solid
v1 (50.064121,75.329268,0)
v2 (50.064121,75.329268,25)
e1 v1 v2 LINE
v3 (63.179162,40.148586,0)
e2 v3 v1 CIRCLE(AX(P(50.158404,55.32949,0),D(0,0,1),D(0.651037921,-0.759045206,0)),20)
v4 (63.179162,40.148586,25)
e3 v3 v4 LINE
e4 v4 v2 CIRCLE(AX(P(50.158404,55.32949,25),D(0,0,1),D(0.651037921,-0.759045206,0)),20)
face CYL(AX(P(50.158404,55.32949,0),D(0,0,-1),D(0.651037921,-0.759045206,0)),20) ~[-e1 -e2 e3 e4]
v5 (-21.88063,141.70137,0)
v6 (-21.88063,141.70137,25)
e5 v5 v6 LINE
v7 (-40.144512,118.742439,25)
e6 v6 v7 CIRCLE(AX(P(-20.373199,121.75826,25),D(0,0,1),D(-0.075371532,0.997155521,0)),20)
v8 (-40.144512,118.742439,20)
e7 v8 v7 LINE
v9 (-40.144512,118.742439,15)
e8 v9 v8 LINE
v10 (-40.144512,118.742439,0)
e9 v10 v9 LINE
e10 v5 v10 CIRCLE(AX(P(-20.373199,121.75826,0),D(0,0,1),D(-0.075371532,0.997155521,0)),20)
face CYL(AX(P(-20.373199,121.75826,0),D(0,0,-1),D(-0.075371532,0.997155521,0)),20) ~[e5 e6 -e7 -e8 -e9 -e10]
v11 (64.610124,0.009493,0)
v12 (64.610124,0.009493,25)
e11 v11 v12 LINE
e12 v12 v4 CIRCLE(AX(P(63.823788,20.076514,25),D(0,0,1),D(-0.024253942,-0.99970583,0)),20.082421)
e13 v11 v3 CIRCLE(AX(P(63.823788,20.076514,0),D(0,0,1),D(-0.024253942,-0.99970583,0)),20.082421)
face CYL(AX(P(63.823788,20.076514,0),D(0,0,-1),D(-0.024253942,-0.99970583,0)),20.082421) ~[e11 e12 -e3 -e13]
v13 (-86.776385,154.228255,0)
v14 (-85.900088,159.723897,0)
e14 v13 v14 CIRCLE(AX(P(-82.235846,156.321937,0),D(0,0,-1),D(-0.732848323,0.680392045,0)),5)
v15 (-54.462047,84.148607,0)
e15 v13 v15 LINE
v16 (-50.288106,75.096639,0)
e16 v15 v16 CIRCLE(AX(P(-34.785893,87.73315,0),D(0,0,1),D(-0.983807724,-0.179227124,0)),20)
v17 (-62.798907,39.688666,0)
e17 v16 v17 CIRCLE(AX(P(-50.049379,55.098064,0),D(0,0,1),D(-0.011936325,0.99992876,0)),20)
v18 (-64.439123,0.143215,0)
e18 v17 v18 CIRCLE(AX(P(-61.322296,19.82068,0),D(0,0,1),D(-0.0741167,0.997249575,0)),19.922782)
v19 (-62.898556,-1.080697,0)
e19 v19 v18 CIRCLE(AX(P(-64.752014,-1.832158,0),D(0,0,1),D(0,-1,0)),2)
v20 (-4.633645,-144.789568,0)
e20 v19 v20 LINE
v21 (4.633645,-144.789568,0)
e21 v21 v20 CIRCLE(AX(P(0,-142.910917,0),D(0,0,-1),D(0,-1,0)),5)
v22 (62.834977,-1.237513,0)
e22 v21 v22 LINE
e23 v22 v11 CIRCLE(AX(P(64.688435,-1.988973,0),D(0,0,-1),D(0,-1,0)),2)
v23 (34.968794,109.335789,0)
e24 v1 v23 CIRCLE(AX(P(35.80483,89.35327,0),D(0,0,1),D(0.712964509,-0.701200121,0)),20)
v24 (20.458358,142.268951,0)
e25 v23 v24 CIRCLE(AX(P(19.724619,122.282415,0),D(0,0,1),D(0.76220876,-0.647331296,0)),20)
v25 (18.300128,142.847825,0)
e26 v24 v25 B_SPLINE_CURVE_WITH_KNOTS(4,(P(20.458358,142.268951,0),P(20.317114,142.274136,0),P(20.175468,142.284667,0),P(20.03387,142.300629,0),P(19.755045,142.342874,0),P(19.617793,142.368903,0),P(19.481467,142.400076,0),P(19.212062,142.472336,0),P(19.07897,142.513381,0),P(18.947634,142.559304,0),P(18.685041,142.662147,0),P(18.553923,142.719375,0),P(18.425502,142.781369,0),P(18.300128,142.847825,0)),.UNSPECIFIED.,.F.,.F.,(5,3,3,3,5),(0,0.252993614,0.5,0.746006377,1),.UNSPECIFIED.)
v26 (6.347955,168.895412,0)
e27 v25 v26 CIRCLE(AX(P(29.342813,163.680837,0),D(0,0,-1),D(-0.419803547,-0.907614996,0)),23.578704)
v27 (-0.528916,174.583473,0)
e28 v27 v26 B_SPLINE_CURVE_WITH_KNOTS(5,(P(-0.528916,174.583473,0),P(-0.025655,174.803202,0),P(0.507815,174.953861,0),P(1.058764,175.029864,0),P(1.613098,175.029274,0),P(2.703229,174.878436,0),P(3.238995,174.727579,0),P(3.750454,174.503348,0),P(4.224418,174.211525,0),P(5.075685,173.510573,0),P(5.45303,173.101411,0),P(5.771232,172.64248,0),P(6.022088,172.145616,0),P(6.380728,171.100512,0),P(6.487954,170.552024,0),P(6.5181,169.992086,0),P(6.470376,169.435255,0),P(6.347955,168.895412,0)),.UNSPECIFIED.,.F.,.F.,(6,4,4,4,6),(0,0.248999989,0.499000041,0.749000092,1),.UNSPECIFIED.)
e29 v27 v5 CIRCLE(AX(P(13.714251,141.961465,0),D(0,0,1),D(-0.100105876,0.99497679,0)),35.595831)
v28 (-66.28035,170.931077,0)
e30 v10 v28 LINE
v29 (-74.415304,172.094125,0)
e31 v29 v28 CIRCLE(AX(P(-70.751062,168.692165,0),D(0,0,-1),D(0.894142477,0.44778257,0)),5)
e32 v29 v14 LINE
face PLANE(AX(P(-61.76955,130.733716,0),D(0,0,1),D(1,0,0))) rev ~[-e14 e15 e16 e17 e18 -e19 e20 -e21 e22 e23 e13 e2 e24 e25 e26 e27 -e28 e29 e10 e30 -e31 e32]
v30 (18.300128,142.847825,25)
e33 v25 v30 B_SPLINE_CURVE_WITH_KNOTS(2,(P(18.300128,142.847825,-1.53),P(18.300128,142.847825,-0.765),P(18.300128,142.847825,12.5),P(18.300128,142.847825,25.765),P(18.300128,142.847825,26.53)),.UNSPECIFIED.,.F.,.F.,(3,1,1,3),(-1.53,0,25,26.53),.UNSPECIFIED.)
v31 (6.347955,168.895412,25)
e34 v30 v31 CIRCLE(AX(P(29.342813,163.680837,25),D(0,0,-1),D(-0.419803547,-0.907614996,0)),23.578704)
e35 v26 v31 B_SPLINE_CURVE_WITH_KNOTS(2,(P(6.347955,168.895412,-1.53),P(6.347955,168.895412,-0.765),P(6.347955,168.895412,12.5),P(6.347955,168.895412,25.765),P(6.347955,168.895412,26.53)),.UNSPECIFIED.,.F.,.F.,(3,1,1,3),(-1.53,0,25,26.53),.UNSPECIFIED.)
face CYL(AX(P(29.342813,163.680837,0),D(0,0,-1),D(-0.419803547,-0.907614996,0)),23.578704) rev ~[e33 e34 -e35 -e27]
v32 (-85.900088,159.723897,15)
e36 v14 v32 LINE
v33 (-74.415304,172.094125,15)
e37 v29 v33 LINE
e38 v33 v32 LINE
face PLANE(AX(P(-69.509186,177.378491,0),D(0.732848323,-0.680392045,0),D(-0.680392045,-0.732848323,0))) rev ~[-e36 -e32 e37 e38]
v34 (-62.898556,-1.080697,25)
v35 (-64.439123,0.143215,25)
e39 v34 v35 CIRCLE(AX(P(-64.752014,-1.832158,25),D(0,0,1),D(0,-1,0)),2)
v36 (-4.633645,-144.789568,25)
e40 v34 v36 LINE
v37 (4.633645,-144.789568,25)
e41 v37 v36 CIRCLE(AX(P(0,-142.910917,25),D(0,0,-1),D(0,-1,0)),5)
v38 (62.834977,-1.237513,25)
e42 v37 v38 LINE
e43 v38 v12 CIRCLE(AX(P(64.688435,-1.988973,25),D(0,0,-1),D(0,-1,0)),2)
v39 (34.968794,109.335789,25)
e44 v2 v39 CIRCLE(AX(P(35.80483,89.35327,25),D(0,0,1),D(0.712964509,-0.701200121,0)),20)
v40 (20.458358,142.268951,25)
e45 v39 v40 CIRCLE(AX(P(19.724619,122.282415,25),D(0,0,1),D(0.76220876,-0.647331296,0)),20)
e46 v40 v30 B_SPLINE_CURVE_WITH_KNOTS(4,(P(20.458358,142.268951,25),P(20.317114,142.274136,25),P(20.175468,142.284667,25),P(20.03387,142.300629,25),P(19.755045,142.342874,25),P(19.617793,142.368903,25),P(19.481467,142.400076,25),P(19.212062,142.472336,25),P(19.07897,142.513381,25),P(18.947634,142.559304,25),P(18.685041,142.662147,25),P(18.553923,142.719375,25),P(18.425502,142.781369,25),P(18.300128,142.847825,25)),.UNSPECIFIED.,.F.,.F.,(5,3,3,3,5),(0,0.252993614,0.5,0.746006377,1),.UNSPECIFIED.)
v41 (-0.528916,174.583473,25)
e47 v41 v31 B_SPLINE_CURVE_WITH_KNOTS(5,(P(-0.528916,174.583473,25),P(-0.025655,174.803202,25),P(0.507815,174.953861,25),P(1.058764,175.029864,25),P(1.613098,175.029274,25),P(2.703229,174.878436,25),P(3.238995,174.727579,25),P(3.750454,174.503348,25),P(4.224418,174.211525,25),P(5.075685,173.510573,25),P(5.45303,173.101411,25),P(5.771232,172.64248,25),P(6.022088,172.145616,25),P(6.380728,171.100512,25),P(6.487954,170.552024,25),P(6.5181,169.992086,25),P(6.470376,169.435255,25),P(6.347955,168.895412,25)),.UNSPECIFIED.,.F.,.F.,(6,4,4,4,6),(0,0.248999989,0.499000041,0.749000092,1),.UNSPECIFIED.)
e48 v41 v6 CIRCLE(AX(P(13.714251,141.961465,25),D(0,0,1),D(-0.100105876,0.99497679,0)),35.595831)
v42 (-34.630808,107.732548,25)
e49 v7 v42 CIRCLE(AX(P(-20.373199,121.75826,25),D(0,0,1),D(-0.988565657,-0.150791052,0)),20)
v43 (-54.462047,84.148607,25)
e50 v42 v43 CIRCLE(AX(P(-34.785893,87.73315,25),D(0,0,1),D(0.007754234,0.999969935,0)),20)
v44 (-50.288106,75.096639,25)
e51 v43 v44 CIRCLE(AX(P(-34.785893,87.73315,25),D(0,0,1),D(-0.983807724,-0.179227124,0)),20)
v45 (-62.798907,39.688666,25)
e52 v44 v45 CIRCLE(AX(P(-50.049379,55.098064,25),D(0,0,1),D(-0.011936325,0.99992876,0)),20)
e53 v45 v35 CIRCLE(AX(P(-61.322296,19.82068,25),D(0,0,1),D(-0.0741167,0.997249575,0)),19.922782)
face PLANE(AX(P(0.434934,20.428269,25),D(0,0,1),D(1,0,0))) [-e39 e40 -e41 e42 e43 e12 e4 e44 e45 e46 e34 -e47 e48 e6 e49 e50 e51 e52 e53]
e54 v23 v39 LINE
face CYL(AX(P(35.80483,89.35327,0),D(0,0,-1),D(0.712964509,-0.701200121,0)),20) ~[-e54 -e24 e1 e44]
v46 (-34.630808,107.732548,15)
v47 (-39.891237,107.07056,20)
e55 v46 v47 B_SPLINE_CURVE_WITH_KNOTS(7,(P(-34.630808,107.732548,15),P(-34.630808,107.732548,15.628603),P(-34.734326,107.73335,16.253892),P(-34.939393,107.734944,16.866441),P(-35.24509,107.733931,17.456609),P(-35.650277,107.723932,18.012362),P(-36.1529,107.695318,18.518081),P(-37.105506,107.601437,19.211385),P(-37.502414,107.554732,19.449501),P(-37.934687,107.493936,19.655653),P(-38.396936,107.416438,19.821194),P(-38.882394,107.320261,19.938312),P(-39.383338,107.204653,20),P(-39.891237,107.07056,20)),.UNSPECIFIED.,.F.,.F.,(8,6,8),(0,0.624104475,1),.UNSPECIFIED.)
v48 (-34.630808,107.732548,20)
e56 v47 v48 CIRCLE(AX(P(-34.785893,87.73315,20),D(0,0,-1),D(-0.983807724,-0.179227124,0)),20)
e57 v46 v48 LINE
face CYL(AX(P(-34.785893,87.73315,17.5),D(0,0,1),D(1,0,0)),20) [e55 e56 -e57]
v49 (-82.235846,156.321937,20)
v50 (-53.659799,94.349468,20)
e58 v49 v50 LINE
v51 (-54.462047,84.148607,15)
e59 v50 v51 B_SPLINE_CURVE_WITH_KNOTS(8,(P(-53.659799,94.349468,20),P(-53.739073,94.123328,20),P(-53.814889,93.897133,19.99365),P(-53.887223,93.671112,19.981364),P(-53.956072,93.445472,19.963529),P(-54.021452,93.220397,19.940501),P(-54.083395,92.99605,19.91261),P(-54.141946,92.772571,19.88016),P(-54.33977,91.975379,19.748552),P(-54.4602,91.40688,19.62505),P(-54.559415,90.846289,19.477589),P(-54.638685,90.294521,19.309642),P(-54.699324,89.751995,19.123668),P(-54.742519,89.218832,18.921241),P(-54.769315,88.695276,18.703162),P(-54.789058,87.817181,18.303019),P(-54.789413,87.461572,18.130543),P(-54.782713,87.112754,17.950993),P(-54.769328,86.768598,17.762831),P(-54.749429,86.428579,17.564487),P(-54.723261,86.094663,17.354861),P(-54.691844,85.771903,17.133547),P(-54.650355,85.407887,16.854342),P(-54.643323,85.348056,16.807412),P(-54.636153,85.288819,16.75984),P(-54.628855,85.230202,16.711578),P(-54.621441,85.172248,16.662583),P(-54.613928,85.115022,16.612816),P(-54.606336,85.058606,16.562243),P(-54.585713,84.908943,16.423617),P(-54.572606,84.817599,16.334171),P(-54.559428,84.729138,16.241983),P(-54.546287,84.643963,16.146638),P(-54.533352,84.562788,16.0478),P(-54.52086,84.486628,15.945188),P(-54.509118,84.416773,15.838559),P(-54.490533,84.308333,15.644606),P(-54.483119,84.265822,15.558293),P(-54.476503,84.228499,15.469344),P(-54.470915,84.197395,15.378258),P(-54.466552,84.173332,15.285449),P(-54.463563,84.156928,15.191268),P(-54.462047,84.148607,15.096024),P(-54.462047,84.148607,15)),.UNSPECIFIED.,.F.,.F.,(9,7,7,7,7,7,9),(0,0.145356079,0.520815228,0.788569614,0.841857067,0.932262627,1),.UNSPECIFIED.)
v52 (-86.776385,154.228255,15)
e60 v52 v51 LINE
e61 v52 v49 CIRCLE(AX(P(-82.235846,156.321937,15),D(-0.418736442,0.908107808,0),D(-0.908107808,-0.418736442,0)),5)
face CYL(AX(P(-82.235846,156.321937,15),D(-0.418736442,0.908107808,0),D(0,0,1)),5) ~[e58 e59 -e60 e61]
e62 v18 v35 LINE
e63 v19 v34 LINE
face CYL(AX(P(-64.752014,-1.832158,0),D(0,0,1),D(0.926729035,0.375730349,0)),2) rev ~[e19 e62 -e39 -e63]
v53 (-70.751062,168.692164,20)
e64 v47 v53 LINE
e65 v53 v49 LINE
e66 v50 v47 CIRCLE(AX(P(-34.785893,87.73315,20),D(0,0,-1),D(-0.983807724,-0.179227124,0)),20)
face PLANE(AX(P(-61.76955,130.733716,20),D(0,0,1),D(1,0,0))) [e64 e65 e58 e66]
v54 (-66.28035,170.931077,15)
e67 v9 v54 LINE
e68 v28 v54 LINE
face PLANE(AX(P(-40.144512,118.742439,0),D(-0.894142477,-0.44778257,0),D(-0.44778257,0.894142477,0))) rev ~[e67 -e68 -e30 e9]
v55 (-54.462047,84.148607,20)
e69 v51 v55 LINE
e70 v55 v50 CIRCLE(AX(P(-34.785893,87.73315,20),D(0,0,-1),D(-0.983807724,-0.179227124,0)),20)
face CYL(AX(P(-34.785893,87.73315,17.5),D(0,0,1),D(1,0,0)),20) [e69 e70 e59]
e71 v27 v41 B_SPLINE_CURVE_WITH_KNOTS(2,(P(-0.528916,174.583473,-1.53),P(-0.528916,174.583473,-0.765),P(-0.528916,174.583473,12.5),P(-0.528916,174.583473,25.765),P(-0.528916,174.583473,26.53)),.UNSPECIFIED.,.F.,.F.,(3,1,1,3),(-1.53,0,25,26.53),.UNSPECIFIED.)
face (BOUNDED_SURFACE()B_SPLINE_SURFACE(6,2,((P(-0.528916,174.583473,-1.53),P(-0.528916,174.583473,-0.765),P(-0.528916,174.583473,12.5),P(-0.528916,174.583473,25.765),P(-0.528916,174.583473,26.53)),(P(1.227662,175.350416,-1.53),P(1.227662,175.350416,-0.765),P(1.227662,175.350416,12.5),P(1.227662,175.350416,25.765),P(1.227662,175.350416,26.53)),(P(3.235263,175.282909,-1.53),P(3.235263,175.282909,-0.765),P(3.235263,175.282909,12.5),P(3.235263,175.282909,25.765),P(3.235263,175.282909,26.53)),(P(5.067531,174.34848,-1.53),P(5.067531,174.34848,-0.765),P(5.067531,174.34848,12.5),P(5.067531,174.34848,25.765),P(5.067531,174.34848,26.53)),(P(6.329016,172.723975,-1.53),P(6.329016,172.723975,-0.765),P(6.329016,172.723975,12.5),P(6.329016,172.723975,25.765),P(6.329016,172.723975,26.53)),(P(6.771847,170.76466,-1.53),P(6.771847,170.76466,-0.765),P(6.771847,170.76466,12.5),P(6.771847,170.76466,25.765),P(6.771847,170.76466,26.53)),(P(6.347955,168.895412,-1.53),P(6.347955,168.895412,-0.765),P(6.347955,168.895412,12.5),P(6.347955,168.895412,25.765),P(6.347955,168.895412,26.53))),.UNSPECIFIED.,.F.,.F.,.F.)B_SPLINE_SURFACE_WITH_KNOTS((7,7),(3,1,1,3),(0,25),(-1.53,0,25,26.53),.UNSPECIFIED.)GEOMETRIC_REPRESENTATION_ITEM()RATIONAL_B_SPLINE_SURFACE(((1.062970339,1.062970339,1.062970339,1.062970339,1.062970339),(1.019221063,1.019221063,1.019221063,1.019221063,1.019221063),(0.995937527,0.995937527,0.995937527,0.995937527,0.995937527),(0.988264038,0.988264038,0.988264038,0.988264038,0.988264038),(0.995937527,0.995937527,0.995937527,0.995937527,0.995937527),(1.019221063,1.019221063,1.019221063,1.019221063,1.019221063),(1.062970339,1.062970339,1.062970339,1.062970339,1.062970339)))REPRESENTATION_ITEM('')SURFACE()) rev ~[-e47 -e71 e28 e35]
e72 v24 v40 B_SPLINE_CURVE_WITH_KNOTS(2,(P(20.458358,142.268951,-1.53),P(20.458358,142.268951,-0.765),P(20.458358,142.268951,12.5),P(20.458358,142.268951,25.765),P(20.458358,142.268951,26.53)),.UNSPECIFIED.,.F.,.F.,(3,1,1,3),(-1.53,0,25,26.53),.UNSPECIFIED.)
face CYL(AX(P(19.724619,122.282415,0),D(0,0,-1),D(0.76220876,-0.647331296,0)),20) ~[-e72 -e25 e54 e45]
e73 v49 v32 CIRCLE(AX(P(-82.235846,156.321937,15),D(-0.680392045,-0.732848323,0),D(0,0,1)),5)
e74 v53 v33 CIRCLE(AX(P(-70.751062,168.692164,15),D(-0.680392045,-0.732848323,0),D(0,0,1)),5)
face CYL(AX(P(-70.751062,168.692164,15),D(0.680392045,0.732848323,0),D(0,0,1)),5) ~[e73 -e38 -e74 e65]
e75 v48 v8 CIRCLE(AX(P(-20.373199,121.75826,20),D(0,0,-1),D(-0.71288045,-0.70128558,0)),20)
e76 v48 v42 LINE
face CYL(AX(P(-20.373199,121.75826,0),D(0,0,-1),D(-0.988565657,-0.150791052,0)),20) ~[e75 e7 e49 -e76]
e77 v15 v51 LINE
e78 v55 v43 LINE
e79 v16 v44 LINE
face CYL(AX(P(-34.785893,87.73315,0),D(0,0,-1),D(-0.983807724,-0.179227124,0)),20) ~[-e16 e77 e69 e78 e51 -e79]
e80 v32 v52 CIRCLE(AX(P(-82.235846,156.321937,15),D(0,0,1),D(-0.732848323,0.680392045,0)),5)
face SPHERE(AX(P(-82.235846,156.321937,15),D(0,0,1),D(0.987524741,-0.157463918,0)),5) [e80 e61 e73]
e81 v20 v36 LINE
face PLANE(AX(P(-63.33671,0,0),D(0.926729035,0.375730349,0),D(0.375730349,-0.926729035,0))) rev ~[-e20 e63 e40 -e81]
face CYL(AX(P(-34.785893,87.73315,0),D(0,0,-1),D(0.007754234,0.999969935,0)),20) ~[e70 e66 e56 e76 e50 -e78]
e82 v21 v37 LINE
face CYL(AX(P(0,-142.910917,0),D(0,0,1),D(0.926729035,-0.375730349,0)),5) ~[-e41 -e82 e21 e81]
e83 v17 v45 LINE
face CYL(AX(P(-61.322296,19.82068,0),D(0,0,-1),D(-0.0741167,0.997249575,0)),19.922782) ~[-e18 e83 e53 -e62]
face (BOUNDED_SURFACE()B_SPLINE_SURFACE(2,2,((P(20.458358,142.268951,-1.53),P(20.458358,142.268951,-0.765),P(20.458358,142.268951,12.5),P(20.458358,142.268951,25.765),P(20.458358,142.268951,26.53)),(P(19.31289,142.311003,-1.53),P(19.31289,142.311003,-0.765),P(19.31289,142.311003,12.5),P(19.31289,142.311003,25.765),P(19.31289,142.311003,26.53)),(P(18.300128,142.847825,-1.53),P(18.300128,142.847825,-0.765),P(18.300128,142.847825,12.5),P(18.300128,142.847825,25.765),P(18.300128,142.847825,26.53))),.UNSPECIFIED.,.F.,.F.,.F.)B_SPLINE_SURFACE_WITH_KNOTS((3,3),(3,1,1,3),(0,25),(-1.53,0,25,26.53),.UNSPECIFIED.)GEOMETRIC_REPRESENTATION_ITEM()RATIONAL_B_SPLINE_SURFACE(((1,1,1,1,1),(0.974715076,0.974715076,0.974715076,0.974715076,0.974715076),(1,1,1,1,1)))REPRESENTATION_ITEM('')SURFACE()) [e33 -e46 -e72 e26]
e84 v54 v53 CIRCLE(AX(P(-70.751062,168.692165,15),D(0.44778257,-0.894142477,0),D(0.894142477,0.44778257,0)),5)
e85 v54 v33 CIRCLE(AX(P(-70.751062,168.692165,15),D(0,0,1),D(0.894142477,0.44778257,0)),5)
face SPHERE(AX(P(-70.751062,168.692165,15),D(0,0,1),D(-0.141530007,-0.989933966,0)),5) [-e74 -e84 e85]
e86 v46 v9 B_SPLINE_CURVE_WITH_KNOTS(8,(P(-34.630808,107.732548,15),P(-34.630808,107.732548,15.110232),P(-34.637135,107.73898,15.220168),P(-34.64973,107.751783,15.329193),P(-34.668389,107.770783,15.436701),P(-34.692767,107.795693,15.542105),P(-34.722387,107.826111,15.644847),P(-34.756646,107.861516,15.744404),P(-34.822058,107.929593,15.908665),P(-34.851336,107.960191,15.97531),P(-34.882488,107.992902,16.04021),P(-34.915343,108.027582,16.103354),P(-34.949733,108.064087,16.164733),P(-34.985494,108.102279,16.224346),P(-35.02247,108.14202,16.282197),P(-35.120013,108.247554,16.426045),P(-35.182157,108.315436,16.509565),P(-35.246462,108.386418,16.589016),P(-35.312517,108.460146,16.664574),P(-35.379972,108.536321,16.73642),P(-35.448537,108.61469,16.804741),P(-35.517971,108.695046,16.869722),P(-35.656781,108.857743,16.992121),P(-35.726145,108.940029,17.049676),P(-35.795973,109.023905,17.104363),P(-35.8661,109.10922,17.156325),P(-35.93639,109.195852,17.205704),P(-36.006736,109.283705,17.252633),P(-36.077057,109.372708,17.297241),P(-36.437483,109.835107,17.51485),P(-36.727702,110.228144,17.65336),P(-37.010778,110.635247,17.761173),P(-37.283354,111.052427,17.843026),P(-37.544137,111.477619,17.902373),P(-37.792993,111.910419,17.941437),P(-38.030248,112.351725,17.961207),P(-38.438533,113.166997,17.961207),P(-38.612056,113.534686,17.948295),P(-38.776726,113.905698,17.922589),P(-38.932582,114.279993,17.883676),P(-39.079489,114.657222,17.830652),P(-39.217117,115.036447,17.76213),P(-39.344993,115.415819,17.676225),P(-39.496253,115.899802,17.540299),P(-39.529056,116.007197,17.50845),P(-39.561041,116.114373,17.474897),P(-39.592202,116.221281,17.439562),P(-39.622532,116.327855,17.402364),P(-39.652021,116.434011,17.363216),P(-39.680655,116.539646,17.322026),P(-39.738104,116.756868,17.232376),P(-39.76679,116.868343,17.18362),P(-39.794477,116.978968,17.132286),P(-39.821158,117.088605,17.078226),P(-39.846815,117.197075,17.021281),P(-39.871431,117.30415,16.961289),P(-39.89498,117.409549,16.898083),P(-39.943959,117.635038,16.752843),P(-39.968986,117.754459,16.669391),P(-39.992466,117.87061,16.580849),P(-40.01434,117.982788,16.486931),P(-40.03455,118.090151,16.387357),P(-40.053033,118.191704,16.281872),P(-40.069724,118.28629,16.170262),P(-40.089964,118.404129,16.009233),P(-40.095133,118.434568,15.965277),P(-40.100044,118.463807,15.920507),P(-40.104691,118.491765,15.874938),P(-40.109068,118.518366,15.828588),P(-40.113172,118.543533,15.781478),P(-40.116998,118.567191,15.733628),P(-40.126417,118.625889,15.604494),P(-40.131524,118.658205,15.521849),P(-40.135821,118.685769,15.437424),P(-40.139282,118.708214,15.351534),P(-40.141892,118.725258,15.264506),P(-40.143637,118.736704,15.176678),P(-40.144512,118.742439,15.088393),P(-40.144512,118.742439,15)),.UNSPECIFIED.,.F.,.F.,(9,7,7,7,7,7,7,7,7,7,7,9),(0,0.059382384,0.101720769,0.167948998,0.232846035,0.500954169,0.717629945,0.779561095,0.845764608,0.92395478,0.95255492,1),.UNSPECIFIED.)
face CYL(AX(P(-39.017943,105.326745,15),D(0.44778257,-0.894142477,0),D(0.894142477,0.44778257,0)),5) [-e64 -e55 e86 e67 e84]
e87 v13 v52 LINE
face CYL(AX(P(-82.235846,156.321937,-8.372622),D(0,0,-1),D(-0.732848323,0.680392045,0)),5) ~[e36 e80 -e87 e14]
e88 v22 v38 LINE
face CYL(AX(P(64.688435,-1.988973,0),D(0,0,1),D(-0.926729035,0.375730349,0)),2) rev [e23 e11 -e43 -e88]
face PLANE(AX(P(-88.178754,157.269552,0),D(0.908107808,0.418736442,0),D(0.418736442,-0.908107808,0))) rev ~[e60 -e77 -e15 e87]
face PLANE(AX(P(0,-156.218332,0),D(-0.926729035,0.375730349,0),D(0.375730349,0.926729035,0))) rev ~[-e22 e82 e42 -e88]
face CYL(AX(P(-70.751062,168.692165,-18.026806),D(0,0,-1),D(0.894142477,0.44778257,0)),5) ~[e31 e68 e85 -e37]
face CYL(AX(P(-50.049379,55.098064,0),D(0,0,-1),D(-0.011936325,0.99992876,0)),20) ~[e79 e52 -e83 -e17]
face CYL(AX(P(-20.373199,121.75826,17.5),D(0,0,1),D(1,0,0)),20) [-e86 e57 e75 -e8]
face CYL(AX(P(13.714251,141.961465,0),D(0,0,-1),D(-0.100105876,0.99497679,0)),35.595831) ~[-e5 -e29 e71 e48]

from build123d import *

# Parameters (mm, degrees)
F1_DEPTH     = 25
F2_R         = 5
F3_R         = 5
F4_R         = 2
F6_R         = 5
F7_DEPTH     = 20
F8_T1_DEPTH  = 16.879655815
F8_T3_DEPTH  = 23.3726224193
F8_T5_DEPTH  = 33.0268060681
F8_T10_DEPTH = 5.1
F8_T16_DEPTH = 5.1
F8_T22_DEPTH = 98.4210661838
F8_S23_R     = 20
F8_T24_DEPTH = 53
F8_S25_R     = 20
F8_T26_DEPTH = 53
F8_T30_DEPTH = 70.867251183
F8_S31_R     = 20
F8_T32_DEPTH = 39
F8_S33_R     = 20
F8_T34_DEPTH = 39


# Not quite as in the source:
# - a fillet or chamfer that OpenCascade refuses, or shapes differently, is made with other operations: its cross-section is extruded or revolved along the edge and cut away or added
# - two fillets or chamfers of one size are made in one step


with BuildPart() as f1:
    # F0 (on Top) → F1 (new body)
    with BuildSketch(Plane.XY):
        with BuildLine():
            ThreePointArc((-62.7989065684, 39.6886658546), (-81.243248627, 20.090620438), (-63.3367104763, 0))
            Line((-63.3367104763, 0), (0, -156.2183324342))
            Line((0, -156.2183324342), (63.3367104763, 0))
            ThreePointArc((63.3367104763, 0), (83.9060549488, 20.1553189736), (63.1791622356, 40.1485861756))
            ThreePointArc((63.1791622356, 40.1485861756), (68.8985621757, 62.3156526678), (50.0641206725, 75.3292680691))
            ThreePointArc((50.0641206725, 75.3292680691), (54.0847867027, 97.4676528526), (34.9687938538, 109.335788913))
            ThreePointArc((34.9687938538, 109.335788913), (37.8165399559, 130.8078112166), (19.4443891765, 142.2804515145))
            ThreePointArc((19.4443891765, 142.2804515145), (6.5496116272, 157.6455026462), (10.1508991793, 177.3784905672))
            ThreePointArc((10.1508991793, 177.3784905672), (-12.7726518652, 165.7418593556), (-21.8806297798, 141.7013702435))
            ThreePointArc((-21.8806297798, 141.7013702435), (-36.0248561638, 134.2091888045), (-40.144512278, 118.7424387834))
            Line((-40.144512278, 118.7424387834), (-34.6308081302, 107.732548238))
            ThreePointArc((-34.6308081302, 107.732548238), (-50.0933619749, 100.6048777691), (-54.4620472952, 84.1486070408))
            Line((-54.4620472952, 84.1486070408), (-50.2881059675, 75.0966394345))
            ThreePointArc((-50.2881059675, 75.0966394345), (-68.9068668709, 61.7610342158), (-62.7989065684, 39.6886658546))
        make_face()
        with BuildLine():
            Line((-19.4251702535, 141.7357782283), (-21.8806297798, 141.7013702435))
            ThreePointArc((-21.8806297798, 141.7013702435), (-20.6534286134, 141.7562965225), (-19.4251702535, 141.7357782283))
        make_face(mode=Mode.SUBTRACT)
        with BuildLine():
            ThreePointArc((-40.144512278, 118.7424387834), (-38.2560486822, 112.8026084286), (-34.6308081302, 107.732548238))
            Line((-34.6308081302, 107.732548238), (-40.144512278, 118.7424387834))
        make_face()
        with BuildLine():
            ThreePointArc((-54.4620472952, 84.1486070408), (-52.9480489841, 79.3584206811), (-50.2881059675, 75.0966394345))
            Line((-50.2881059675, 75.0966394345), (-54.4620472952, 84.1486070408))
        make_face()
        with BuildLine():
            ThreePointArc((-19.4251702535, 141.7357782283), (-20.6534286134, 141.7562965225), (-21.8806297798, 141.7013702435))
            Line((-21.8806297798, 141.7013702435), (-19.4251702535, 141.7357782283))
        make_face()
    extrude(amount=F1_DEPTH)

    # F2
    f2_edges = [f1.edges().sort_by_distance(p)[0] for p in [
        (10.150899, 177.378491, 12.5),
    ]]
    fillet(f2_edges, radius=F2_R)

    # F3
    f3_edges = [f1.edges().sort_by_distance(p)[0] for p in [
        (0, -156.218332, 12.5),
    ]]
    fillet(f3_edges, radius=F3_R)

    # F4
    f4_edges = [f1.edges().sort_by_distance(p)[0] for p in [
        (63.33671, 0, 12.5),
        (-63.33671, 0, 12.5),
    ]]
    fillet(f4_edges, radius=F4_R)

    # F6
    f6_edges = [f1.edges().sort_by_distance(p)[0] for p in [
        (19.444389, 142.280452, 12.5),
    ]]
    fillet(f6_edges, radius=F6_R)

    # F0 (on Top) → F7 (join)
    with BuildSketch(Plane.XY):
        with BuildLine():
            Line((-88.1787538528, 157.26955235), (-54.4620472952, 84.1486070408))
            ThreePointArc((-54.4620472952, 84.1486070408), (-50.0933619749, 100.6048777691), (-34.6308081302, 107.732548238))
            ThreePointArc((-34.6308081302, 107.732548238), (-38.2560486822, 112.8026084286), (-40.144512278, 118.7424387834))
            Line((-40.144512278, 118.7424387834), (-69.5091858506, 177.3784905672))
            Line((-69.5091858506, 177.3784905672), (-88.1787538528, 157.26955235))
        make_face()
    extrude(amount=F7_DEPTH)

    # F8: fillet of radius 5 on 5 edges, made by hand

    # F8_s2 → F8_t1 (cut)
    with BuildSketch(Plane(origin=(51.3609651153, 55.3207484048, 0), x_dir=(0, 0, 1), z_dir=(-0.6803920453, -0.7328483231, 0))):
        with BuildLine():
            ThreePointArc((20, 166.626604285), (18.5355339059, 170.1621381909), (15, 171.626604285))
            Line((15, 171.626604285), (20, 171.626604285))
            Line((20, 171.626604285), (20, 166.626604285))
        make_face()
    extrude(amount=F8_T1_DEPTH, mode=Mode.SUBTRACT)

    # F8_s4 → F8_t3 (cut)
    with BuildSketch(Plane.XY.offset(-8.3726224193)):
        with BuildLine():
            ThreePointArc((-85.9000875758, 159.72389727), (-87.1734696665, 157.1092566329), (-86.7763850028, 154.2282548314))
            Line((-86.7763850028, 154.2282548314), (-88.1787538528, 157.26955235))
            Line((-88.1787538528, 157.26955235), (-85.9000875758, 159.72389727))
        make_face()
    extrude(amount=F8_T3_DEPTH, mode=Mode.SUBTRACT)

    # F8_s6 → F8_t5 (cut)
    with BuildSketch(Plane.XY.offset(-18.0268060681)):
        with BuildLine():
            ThreePointArc((-66.280350029, 170.9310773526), (-70.0434123782, 173.6418343313), (-74.4153040312, 172.0941247282))
            Line((-74.4153040312, 172.0941247282), (-69.5091858506, 177.3784905672))
            Line((-69.5091858506, 177.3784905672), (-66.280350029, 170.9310773526))
        make_face()
    extrude(amount=F8_T5_DEPTH, mode=Mode.SUBTRACT)


with BuildPart() as f8_tool8:
    # F8_s9 → F8_t10 (new body)
    with BuildSketch(Plane.XY.offset(15)):
        Polygon((-82.2358459604, 156.3219370433), (-85.9733724081, 159.7919364745), (-88.2976120107, 157.2885046562), (-86.8671957836, 154.1863811872), align=None)
    extrude(amount=F8_T10_DEPTH)

    # F8_s11 → F8_t12 (revolve, cut)
    with BuildSketch(Plane(origin=(-82.2358459604, 156.3219370433, 15), x_dir=(0.9875247412, -0.1574639179, 0), z_dir=(-0.1574639179, -0.9875247412, 0))):
        with BuildLine():
            ThreePointArc((0, -5), (5, 0), (0, 5))
            Line((0, 5), (0, -5))
        make_face()
    revolve(axis=Axis((-82.2358459604, 156.3219370433, 15), (0, 0, 1)), mode=Mode.SUBTRACT)


with BuildPart() as f1_1:
    add(f1.part)

    # F8_t7: cut F8_tool8
    add(f8_tool8.part, mode=Mode.SUBTRACT)


with BuildPart() as f8_tool14:
    # F8_s15 → F8_t16 (new body)
    with BuildSketch(Plane.XY.offset(15)):
        Polygon((-70.7510624158, 168.6921645015), (-74.4885888636, 172.1621639327), (-69.4843483193, 177.5522170885), (-66.1909357813, 170.9758556096), align=None)
    extrude(amount=F8_T16_DEPTH)

    # F8_s17 → F8_t18 (revolve, cut)
    with BuildSketch(Plane(origin=(-70.7510624158, 168.6921645015, 15), x_dir=(-0.1415300075, -0.989933966, 0), z_dir=(-0.989933966, 0.1415300075, 0))):
        with BuildLine():
            ThreePointArc((0, -5), (5, 0), (0, 5))
            Line((0, 5), (0, -5))
        make_face()
    revolve(axis=Axis((-70.7510624158, 168.6921645015, 15), (0, 0, 1)), mode=Mode.SUBTRACT)


with BuildPart() as f1_2:
    add(f1_1.part)

    # F8_t13: cut F8_tool14
    add(f8_tool14.part, mode=Mode.SUBTRACT)


with BuildPart() as f8_tool20:
    # F8_s21 → F8_t22 (new body)
    with BuildSketch(Plane(origin=(-73.8618913818, 160.1832406418, 0), x_dir=(0, 0, 1), z_dir=(0.4187364424, -0.9081078085, 0))):
        with BuildLine():
            ThreePointArc((20, 9.2213220725), (18.5355339059, 12.7568559784), (15, 14.2213220725))
            Line((15, 14.2213220725), (20, 14.2213220725))
            Line((20, 14.2213220725), (20, 9.2213220725))
        make_face()
    extrude(amount=F8_T22_DEPTH)

    # F8_s23 → F8_t24 (cut, symmetric)
    with BuildSketch(Plane.XY.offset(17.5)):
        with Locations((-34.7858928144, 87.7331495285)):
            Circle(F8_S23_R)
    extrude(amount=F8_T24_DEPTH, both=True, mode=Mode.SUBTRACT)

    # F8_s25 → F8_t26 (cut, symmetric)
    with BuildSketch(Plane.XY.offset(17.5)):
        with Locations((-50.049379468, 55.0980642438)):
            Circle(F8_S25_R)
    extrude(amount=F8_T26_DEPTH, both=True, mode=Mode.SUBTRACT)


with BuildPart() as f1_3:
    add(f1_2.part)

    # F8_t19: cut F8_tool20
    add(f8_tool20.part, mode=Mode.SUBTRACT)


with BuildPart() as f8_tool28:
    # F8_s29 → F8_t30 (new body)
    with BuildSketch(Plane(origin=(-49.9943289817, 99.8298195219, 0), x_dir=(0, 0, 1), z_dir=(-0.4477825702, 0.8941424774, 0))):
        with BuildLine():
            ThreePointArc((15, 17.2758807713), (18.5355339059, 15.8114146772), (20, 12.2758807713))
            Line((20, 12.2758807713), (20, 17.2758807713))
            Line((20, 17.2758807713), (15, 17.2758807713))
        make_face()
    extrude(amount=F8_T30_DEPTH)

    # F8_s31 → F8_t32 (cut, symmetric)
    with BuildSketch(Plane.XY.offset(17.5)):
        with Locations((-20.3731991351, 121.7582598329)):
            Circle(F8_S31_R)
    extrude(amount=F8_T32_DEPTH, both=True, mode=Mode.SUBTRACT)

    # F8_s33 → F8_t34 (cut, symmetric)
    with BuildSketch(Plane.XY.offset(17.5)):
        with Locations((-34.7858928144, 87.7331495285)):
            Circle(F8_S33_R)
    extrude(amount=F8_T34_DEPTH, both=True, mode=Mode.SUBTRACT)


with BuildPart() as f1_4:
    add(f1_3.part)

    # F8_t27: cut F8_tool28
    add(f8_tool28.part, mode=Mode.SUBTRACT)


solid = f1_4.part
